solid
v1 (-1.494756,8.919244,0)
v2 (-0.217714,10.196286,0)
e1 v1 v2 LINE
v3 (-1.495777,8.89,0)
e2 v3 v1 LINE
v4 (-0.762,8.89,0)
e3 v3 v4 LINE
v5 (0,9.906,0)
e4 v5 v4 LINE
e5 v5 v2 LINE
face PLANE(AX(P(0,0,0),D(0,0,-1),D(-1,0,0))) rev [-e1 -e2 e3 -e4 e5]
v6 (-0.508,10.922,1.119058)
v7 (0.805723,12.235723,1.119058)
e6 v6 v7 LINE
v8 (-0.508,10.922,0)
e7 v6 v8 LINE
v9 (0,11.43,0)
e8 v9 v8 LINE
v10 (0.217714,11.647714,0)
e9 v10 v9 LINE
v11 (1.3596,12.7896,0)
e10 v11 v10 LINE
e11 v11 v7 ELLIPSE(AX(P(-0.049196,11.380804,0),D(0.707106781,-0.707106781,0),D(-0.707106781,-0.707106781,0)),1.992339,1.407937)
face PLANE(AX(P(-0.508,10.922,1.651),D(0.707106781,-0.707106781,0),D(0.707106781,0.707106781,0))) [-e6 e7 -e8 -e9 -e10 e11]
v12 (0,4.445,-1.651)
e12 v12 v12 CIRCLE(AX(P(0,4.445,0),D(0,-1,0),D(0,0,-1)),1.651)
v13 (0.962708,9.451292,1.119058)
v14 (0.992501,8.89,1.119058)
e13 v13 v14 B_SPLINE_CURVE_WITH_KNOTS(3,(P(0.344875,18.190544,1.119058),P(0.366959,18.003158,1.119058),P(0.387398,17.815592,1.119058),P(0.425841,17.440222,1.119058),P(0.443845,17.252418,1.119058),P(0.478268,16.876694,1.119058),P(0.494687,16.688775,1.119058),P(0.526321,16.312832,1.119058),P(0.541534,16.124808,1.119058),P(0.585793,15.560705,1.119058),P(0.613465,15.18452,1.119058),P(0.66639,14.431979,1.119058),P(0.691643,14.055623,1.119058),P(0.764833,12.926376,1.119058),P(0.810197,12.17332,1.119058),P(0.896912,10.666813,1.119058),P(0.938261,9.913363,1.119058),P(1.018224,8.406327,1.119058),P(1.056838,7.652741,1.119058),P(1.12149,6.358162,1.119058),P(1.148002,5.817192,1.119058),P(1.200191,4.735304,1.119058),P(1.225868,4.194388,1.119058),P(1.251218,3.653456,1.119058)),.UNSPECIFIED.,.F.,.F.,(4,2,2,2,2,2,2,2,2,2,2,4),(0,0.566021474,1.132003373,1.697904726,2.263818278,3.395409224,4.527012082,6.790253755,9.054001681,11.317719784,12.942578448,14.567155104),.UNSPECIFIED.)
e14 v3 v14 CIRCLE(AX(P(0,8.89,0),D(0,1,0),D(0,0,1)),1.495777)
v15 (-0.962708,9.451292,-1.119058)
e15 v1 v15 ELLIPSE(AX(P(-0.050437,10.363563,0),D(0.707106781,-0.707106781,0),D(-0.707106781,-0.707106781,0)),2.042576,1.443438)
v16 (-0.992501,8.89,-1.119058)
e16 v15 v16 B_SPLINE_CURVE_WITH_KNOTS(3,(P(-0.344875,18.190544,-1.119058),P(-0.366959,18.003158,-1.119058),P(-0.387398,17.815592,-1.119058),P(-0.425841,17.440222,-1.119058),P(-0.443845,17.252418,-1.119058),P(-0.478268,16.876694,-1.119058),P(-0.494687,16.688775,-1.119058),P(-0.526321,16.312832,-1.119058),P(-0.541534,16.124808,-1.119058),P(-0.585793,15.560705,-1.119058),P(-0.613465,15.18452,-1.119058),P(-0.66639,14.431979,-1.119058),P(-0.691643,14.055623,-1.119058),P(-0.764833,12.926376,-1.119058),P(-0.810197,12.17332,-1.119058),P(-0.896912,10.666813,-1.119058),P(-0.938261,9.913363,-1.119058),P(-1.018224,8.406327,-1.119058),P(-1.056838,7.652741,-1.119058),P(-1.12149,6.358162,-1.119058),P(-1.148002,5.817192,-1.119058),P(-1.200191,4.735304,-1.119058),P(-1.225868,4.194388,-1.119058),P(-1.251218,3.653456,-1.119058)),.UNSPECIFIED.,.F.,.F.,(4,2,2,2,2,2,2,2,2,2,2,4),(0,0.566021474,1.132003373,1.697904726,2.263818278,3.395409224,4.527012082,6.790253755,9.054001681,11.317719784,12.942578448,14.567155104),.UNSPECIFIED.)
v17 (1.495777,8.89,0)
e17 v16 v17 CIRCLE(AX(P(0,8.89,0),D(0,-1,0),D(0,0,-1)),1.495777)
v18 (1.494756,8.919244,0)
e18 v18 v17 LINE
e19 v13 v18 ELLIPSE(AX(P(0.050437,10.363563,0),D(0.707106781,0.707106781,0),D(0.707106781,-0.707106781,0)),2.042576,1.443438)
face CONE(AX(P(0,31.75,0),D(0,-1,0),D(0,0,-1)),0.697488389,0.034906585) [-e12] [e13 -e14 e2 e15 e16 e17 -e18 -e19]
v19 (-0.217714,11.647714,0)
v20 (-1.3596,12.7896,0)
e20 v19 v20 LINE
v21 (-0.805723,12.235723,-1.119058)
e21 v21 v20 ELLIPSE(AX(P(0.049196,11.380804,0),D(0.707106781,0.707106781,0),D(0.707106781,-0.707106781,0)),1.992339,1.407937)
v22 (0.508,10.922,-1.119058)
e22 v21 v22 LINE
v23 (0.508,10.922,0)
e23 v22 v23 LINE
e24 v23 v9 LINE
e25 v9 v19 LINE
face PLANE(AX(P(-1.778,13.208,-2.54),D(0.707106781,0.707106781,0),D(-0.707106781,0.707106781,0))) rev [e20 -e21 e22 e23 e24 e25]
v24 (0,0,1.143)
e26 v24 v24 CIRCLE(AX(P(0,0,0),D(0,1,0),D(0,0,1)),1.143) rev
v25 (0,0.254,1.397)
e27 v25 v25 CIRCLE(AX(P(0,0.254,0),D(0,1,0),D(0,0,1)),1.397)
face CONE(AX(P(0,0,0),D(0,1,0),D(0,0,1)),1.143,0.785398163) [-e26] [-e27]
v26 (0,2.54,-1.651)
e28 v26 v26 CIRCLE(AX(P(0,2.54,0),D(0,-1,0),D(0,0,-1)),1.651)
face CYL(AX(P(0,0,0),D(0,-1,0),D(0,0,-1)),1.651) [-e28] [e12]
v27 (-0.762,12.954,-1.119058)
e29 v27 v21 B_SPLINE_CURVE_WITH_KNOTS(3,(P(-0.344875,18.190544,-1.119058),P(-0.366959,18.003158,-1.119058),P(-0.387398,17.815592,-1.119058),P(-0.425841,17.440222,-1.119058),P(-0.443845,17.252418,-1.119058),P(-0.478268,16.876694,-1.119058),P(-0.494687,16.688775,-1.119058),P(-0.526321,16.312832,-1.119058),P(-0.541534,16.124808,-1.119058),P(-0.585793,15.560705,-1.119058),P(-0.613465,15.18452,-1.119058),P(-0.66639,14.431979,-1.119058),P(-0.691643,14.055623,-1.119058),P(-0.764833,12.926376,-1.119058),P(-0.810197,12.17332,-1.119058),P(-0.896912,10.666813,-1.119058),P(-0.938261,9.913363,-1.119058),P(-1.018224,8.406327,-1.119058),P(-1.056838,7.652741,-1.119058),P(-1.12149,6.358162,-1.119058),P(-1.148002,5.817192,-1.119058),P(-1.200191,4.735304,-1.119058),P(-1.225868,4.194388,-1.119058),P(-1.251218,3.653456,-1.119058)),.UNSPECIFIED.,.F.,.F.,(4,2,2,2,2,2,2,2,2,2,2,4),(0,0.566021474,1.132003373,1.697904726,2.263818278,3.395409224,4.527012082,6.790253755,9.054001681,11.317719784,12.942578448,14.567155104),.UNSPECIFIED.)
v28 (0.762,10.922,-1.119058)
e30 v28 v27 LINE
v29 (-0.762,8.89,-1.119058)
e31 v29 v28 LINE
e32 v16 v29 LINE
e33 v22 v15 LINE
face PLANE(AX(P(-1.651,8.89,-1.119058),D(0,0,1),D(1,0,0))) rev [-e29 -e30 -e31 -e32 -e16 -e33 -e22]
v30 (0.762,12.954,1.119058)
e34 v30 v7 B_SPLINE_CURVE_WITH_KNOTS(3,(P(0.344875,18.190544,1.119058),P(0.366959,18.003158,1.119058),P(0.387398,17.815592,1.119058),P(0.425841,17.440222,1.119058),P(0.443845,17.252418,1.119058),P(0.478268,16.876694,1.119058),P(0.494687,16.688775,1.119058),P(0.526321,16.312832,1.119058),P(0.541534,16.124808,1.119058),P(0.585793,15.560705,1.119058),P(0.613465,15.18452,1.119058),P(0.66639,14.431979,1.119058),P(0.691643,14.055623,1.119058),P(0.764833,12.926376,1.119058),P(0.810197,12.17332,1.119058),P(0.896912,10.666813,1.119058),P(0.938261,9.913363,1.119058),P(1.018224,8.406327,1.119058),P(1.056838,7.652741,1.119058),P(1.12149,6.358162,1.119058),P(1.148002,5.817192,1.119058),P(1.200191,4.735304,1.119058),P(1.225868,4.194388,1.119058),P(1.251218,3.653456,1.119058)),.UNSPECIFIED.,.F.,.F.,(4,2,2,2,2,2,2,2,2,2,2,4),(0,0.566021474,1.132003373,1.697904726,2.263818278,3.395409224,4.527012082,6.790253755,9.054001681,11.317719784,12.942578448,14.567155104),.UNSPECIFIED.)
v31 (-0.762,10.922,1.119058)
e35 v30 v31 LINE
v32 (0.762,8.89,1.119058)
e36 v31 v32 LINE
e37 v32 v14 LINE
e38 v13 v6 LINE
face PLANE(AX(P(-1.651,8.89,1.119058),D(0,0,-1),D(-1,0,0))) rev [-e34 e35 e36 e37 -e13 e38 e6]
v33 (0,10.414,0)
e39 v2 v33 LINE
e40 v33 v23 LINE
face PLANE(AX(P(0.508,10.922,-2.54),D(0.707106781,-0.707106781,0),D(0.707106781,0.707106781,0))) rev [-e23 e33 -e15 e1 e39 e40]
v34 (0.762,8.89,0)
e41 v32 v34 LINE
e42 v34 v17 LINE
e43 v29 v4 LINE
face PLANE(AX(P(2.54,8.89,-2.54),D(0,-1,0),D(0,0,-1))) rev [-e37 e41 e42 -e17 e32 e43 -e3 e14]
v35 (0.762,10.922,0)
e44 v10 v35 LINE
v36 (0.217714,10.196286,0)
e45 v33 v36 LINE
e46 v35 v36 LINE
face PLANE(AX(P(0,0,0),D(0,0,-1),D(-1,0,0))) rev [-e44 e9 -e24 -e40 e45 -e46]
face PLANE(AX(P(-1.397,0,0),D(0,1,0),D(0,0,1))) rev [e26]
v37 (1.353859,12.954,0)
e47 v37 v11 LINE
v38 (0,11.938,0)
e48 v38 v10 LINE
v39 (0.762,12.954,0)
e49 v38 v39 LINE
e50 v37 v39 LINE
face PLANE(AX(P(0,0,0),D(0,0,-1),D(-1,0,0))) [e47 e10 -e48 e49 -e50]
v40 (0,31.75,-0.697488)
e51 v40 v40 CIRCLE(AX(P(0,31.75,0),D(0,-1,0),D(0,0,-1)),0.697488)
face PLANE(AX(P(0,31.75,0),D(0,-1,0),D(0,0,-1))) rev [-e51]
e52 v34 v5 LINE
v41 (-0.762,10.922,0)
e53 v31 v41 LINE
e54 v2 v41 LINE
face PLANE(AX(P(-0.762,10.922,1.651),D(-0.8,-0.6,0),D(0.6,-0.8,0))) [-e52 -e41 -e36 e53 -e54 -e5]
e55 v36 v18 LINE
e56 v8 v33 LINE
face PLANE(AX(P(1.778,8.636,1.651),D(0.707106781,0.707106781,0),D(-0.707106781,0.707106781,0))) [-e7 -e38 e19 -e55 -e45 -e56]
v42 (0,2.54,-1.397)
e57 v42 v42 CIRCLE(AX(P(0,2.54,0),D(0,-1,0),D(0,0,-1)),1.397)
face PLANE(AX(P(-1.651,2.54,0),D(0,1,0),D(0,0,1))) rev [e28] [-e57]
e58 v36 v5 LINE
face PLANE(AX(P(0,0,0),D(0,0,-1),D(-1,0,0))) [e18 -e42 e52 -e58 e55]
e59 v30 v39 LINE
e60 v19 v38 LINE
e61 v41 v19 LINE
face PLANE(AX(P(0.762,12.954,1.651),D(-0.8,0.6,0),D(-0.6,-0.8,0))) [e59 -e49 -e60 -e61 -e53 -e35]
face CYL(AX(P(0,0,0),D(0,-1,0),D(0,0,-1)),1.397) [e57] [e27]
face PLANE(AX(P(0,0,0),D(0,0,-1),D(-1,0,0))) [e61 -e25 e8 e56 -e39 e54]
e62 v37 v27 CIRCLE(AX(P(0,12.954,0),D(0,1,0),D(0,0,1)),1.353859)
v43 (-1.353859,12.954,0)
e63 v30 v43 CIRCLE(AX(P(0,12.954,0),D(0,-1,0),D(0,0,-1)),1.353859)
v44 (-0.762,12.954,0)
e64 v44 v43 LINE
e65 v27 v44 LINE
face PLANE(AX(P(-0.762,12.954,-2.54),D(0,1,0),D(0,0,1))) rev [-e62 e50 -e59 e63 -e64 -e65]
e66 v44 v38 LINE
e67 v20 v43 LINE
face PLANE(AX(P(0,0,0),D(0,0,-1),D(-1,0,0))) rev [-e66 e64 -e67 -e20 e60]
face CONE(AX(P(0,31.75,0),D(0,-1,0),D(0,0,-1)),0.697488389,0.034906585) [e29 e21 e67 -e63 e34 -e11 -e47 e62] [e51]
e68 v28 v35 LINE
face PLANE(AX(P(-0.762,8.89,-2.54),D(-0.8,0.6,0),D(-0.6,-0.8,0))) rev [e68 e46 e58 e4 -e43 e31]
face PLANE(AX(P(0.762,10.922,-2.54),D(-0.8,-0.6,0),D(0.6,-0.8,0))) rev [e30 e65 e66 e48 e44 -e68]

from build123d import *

# Parameters (mm, degrees)
CHAMFER1_SIZE           = 0.254
CUT_EXTRUDE1_DEPTH      = 2.54
CUT_EXTRUDE2_DEPTH      = 1.49577718
CUT_EXTRUDE3_DEPTH      = 32.835736241
CUT_EXTRUDE3_DEPTH_BACK = 32.835736241
SKETCH9_W               = 0.424246117
SKETCH9_H               = 4.064


# Read off the part's stored shape, not the designer's step: Cut-Extrude2
with BuildPart() as part:
    # Sketch1 → Revolve1 (revolve)
    with BuildSketch(Plane.XY, mode=Mode.PRIVATE) as revolve1_sk:
        Polygon((0, 0), (0, 31.75), (-0.697488389, 31.75), (-1.651, 4.445), (-1.651, 2.54), (-1.397, 2.54), (-1.397, 0), align=None)
    revolve(revolve1_sk.sketch.rotate(Axis((0, 0, 0), (0, 1, 0)), 270), axis=Axis((0, 0, 0), (0, 1, 0)))

    # Chamfer1
    chamfer1_edges = [part.edges().sort_by_distance(p)[0] for p in [
        (0, 0, 1.397),
    ]]
    chamfer(chamfer1_edges, length=CHAMFER1_SIZE)

    # Sketch7 → Cut-Extrude1 (cut)
    with BuildSketch(Plane.XY):
        Polygon((-1.778, 13.208), (0.508, 10.922), (-1.778, 8.636), align=None)
        Polygon((-0.762, 12.954), (2.54, 12.954), (2.54, 8.89), (-0.762, 8.89), (0.762, 10.922), align=None)
    extrude(amount=-CUT_EXTRUDE1_DEPTH, mode=Mode.SUBTRACT)

    # Cut-Extrude2 outline → Cut-Extrude2 (cut)
    with BuildSketch(Plane.XY):
        Polygon((-0.508, 10.922), (1.778, 8.636), (1.778, 13.208), align=None)
        Polygon((-2.54, 8.89), (0.762, 8.89), (-0.762, 10.922), (0.762, 12.954), (-2.54, 12.954), align=None)
    extrude(amount=CUT_EXTRUDE2_DEPTH, mode=Mode.SUBTRACT)

    # Sketch9 → Cut-Extrude3 (cut, two sides: drawn at the far end of the back side and taken through both)
    with BuildSketch(Plane(origin=(0, 0, 0), x_dir=(0, 0, -1), z_dir=(1, 0, 0)).offset(-CUT_EXTRUDE3_DEPTH_BACK)):
        with Locations((-1.331180992, 10.922)):
            Rectangle(SKETCH9_W, SKETCH9_H)
        with Locations((1.331180992, 10.922)):
            Rectangle(SKETCH9_W, SKETCH9_H)
    extrude(amount=CUT_EXTRUDE3_DEPTH + CUT_EXTRUDE3_DEPTH_BACK, mode=Mode.SUBTRACT)


solid = part.part
